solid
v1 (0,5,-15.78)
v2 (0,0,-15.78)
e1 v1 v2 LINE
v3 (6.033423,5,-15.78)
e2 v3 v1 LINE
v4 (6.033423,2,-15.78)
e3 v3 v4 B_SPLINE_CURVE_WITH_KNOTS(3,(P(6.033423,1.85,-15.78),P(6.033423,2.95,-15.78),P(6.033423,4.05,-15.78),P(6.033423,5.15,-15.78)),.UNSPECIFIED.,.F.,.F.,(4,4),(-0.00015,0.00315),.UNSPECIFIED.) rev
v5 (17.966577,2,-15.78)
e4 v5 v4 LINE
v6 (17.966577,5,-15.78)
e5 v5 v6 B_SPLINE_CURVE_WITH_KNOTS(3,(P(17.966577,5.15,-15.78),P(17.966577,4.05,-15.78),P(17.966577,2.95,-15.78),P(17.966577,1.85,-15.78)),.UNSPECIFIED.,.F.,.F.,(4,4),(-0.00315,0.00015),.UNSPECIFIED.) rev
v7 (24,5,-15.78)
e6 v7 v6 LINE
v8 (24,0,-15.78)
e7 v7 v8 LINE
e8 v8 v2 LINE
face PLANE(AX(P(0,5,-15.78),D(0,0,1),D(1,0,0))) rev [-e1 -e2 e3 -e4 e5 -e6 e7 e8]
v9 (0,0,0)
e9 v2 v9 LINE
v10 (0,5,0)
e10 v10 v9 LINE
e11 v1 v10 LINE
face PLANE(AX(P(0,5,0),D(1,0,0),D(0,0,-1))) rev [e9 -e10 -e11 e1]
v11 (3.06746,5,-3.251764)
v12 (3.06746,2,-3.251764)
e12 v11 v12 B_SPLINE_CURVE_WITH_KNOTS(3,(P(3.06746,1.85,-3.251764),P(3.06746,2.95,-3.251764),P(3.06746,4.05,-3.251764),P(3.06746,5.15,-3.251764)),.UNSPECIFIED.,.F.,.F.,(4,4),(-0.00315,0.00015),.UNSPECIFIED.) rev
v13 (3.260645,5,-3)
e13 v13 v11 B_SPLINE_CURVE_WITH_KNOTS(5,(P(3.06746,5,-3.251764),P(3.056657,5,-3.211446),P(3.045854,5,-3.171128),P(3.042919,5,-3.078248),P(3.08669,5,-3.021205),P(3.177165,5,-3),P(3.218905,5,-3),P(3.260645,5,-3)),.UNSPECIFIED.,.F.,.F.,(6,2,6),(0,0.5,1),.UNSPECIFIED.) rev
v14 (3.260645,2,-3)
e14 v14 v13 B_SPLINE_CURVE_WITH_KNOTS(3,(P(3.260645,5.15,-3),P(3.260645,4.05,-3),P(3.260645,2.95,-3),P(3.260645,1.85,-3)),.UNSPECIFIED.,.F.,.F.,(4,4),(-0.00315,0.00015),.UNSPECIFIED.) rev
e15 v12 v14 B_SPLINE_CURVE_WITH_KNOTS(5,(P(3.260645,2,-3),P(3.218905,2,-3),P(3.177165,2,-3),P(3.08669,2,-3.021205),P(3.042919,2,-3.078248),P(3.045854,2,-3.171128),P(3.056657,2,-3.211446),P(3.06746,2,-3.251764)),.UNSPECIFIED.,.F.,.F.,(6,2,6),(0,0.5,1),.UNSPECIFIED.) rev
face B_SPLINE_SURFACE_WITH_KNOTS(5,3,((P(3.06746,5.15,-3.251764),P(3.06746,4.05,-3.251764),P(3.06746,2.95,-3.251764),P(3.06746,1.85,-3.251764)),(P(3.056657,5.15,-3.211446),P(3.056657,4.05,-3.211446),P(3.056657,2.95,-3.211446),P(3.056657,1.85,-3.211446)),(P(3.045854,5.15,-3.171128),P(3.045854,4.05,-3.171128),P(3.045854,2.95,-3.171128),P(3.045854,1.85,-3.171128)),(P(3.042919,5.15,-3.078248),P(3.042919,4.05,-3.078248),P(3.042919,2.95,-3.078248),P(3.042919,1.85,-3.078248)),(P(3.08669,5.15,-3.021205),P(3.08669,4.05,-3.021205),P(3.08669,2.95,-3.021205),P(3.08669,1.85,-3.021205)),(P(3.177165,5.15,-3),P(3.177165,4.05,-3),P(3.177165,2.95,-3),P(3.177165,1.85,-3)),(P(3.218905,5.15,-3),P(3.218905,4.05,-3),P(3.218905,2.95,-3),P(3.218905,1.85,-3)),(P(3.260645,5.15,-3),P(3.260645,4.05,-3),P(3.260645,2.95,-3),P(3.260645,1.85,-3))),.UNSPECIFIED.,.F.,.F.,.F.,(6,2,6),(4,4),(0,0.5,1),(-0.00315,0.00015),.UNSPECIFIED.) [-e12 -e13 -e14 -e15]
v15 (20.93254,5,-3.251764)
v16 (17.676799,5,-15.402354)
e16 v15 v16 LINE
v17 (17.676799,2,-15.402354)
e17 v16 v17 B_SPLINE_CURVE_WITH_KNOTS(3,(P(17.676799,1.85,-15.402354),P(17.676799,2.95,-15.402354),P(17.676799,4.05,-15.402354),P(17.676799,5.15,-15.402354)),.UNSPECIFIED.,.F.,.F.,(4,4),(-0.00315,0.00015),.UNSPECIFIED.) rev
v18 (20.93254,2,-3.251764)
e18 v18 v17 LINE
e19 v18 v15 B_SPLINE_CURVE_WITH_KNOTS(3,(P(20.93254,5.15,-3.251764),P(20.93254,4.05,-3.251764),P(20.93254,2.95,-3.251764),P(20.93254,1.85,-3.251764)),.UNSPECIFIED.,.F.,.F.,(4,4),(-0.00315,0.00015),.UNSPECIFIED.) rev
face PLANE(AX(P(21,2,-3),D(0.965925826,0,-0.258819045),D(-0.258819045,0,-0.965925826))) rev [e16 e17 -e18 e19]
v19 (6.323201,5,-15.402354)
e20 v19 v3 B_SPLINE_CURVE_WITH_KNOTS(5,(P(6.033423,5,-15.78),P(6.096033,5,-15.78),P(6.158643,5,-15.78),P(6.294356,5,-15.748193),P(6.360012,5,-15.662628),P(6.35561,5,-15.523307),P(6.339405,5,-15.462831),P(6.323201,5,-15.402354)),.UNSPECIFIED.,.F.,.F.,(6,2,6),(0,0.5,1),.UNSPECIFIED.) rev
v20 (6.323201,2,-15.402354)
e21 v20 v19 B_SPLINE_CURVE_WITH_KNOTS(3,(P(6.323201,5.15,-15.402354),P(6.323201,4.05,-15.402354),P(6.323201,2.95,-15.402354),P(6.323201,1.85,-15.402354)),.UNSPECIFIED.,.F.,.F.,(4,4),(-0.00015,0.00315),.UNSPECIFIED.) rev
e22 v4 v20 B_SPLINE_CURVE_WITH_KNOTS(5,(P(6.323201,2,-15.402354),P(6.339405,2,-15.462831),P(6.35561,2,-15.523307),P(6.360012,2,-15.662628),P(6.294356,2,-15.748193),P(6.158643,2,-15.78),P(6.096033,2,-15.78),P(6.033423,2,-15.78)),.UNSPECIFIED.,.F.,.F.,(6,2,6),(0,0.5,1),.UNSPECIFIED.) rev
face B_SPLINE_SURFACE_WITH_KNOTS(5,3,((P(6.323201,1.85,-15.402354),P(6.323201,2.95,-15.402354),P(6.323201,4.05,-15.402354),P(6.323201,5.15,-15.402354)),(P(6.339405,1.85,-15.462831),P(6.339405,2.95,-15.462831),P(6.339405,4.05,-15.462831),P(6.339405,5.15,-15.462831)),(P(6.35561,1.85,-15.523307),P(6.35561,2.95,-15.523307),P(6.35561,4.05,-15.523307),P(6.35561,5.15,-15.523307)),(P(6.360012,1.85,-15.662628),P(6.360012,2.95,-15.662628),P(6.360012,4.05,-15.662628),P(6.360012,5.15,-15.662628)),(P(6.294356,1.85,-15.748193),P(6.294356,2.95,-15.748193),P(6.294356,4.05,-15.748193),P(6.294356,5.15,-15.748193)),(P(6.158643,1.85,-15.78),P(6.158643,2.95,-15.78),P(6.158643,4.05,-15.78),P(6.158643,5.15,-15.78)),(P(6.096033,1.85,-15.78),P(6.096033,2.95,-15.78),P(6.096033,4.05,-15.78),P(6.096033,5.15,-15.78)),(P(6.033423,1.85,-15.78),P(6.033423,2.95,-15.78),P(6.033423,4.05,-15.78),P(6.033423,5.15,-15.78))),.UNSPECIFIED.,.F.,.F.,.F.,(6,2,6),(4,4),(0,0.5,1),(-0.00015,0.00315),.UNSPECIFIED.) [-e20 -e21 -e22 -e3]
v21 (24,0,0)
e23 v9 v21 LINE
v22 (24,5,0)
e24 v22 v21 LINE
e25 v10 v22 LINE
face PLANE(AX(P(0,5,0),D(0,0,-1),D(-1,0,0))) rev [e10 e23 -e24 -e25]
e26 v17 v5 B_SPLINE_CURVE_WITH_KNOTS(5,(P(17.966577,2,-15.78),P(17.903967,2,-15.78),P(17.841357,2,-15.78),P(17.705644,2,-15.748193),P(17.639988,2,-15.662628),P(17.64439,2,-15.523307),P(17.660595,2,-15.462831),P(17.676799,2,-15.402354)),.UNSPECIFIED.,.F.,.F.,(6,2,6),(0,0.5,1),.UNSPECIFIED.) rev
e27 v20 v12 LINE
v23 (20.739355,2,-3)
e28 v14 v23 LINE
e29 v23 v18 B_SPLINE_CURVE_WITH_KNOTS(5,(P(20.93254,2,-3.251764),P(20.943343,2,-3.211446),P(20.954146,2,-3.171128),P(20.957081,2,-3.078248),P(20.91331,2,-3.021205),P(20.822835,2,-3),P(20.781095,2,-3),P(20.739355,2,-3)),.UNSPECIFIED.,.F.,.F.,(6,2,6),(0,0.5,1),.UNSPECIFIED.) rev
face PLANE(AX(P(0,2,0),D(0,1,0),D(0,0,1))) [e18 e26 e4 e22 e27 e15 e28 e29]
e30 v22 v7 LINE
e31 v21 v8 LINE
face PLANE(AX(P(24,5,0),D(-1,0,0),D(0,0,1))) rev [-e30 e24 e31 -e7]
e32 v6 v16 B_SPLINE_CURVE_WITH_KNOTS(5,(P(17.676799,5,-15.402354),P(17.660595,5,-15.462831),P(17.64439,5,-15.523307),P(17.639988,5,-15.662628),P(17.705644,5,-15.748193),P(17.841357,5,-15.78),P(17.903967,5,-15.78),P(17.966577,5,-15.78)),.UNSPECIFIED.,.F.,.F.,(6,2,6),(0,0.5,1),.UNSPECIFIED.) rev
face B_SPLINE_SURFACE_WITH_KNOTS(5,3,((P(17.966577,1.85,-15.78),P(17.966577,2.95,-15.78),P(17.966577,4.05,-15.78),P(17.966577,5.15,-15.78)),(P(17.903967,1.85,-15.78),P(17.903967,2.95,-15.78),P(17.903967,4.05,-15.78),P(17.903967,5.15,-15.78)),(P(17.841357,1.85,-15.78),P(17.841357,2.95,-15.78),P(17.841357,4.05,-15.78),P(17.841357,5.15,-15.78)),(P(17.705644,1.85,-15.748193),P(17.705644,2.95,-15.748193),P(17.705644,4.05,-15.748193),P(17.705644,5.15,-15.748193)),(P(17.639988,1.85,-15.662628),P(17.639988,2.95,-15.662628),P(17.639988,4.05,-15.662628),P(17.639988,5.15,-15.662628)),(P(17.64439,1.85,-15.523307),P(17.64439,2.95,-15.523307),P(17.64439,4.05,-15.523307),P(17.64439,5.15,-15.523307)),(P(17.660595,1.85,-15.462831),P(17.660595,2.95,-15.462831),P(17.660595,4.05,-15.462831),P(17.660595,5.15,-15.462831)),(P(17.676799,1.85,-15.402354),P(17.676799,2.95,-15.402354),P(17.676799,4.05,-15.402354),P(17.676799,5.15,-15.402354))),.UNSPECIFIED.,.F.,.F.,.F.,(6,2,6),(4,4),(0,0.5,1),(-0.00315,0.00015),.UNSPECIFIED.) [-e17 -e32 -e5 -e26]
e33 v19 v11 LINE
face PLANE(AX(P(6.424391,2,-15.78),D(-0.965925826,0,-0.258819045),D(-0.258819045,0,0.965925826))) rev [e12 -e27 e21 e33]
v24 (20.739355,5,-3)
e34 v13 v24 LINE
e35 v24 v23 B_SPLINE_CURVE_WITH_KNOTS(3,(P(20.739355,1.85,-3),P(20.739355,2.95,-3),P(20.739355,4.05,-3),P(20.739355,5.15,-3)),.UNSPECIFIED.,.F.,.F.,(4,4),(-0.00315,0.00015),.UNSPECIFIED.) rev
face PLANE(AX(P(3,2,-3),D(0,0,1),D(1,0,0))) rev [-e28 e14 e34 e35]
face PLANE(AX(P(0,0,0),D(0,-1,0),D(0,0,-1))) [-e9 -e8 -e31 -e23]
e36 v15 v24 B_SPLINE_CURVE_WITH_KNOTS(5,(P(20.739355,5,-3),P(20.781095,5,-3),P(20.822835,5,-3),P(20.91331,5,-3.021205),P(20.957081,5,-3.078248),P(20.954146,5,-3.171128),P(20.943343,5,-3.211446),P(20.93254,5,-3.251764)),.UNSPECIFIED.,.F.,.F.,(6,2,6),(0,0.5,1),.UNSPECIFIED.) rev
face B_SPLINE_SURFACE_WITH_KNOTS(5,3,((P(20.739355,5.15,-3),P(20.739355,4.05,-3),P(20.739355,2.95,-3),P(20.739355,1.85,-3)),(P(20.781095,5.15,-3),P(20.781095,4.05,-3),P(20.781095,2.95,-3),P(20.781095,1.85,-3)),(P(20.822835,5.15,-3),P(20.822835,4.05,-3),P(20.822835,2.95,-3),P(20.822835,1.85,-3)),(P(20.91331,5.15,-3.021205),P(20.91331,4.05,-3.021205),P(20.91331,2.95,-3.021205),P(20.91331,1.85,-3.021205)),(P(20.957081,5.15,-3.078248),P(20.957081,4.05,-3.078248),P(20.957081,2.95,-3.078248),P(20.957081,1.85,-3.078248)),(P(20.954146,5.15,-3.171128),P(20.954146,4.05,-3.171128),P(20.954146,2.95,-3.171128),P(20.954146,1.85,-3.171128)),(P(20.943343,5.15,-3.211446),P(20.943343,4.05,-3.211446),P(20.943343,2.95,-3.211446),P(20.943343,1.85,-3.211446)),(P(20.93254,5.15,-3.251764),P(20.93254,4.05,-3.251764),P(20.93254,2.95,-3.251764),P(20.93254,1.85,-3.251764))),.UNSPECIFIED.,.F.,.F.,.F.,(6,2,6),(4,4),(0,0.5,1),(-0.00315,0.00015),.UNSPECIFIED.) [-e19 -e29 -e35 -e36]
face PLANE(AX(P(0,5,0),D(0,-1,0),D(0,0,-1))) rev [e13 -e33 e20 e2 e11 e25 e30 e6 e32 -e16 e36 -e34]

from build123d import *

# Parameters (mm, degrees)
SKETCH1_W           = 24
SKETCH1_H           = 15.78
BOSS_EXTRUDE1_DEPTH = 5
CUT_EXTRUDE1_DEPTH  = 3


with BuildPart() as part:
    # Sketch1 → Boss-Extrude1 (new body)
    with BuildSketch(Plane(origin=(0, 0, 0), x_dir=(1, 0, 0), z_dir=(0, 1, 0))):
        with Locations((12, 7.89)):
            Rectangle(SKETCH1_W, SKETCH1_H)
    extrude(amount=BOSS_EXTRUDE1_DEPTH)

    # Sketch2 → Cut-Extrude1 (cut)
    with BuildSketch(Plane(origin=(0, 5, 0), x_dir=(1, 0, 0), z_dir=(0, 1, 0))):
        Polygon((6.424390679, 15.78), (3, 3), (21, 3), (17.575609321, 15.78), align=None)
    extrude(amount=-CUT_EXTRUDE1_DEPTH, mode=Mode.SUBTRACT)

    # Fillet1
    # a fillet whose section is not a circle: 0.2 mm, written as the material it adds along each edge
    with BuildSketch(Plane(origin=(21, 5, -3), x_dir=(-1, 0, 0), z_dir=(0, -1, 0)), Plane(origin=(3, 5, -3), x_dir=(0.25881904510252013, 0, -0.9659258262890685), z_dir=(0, -1, 0))) as fillet1_piece_1:
        with BuildLine():
            add(Edge.make_bspline([(0.260645075, 0), (0.21890515, 0), (0.177165225, 0), (0.086689828, 0.021204892), (0.042919331, 0.078247714), (0.045853734, 0.171128466), (0.056656822, 0.211446138), (0.067459909, 0.251763809)], knots=[0, 0, 0, 0, 0, 0, 0.5, 0.5, 1, 1, 1, 1, 1, 1], degree=5))
            Line((0.067459909, 0.251763809), (0, 0))
            Line((0, 0), (0.260645075, 0))
        make_face()
    extrude(amount=3.651612686)

    # Fillet2
    # a fillet whose section is not a circle: 0.3 mm, written as the material it takes off along each edge
    with BuildSketch(Plane(origin=(6.424390679, 5.97741903, -15.78), x_dir=(-1, 0, 0), z_dir=(0, -1, 0)), Plane(origin=(17.575609321, 5.97741903, -15.78), x_dir=(0.25881904510251846, 0, 0.9659258262890689), z_dir=(0, -1, 0))) as fillet2_piece_1:
        with BuildLine():
            add(Edge.make_bspline([(0.390967612, 0), (0.328357725, 0), (0.265747838, 0), (0.130034743, -0.031807338), (0.064378997, -0.117371571), (0.068780602, -0.2566927), (0.084985233, -0.317169207), (0.101189864, -0.377645714)], knots=[0, 0, 0, 0, 0, 0, 0.5, 0.5, 1, 1, 1, 1, 1, 1], degree=5))
            Line((0.101189864, -0.377645714), (0, 0))
            Line((0, 0), (0.390967612, 0))
        make_face()
    extrude(amount=3.97741903, mode=Mode.SUBTRACT)


solid = part.part
